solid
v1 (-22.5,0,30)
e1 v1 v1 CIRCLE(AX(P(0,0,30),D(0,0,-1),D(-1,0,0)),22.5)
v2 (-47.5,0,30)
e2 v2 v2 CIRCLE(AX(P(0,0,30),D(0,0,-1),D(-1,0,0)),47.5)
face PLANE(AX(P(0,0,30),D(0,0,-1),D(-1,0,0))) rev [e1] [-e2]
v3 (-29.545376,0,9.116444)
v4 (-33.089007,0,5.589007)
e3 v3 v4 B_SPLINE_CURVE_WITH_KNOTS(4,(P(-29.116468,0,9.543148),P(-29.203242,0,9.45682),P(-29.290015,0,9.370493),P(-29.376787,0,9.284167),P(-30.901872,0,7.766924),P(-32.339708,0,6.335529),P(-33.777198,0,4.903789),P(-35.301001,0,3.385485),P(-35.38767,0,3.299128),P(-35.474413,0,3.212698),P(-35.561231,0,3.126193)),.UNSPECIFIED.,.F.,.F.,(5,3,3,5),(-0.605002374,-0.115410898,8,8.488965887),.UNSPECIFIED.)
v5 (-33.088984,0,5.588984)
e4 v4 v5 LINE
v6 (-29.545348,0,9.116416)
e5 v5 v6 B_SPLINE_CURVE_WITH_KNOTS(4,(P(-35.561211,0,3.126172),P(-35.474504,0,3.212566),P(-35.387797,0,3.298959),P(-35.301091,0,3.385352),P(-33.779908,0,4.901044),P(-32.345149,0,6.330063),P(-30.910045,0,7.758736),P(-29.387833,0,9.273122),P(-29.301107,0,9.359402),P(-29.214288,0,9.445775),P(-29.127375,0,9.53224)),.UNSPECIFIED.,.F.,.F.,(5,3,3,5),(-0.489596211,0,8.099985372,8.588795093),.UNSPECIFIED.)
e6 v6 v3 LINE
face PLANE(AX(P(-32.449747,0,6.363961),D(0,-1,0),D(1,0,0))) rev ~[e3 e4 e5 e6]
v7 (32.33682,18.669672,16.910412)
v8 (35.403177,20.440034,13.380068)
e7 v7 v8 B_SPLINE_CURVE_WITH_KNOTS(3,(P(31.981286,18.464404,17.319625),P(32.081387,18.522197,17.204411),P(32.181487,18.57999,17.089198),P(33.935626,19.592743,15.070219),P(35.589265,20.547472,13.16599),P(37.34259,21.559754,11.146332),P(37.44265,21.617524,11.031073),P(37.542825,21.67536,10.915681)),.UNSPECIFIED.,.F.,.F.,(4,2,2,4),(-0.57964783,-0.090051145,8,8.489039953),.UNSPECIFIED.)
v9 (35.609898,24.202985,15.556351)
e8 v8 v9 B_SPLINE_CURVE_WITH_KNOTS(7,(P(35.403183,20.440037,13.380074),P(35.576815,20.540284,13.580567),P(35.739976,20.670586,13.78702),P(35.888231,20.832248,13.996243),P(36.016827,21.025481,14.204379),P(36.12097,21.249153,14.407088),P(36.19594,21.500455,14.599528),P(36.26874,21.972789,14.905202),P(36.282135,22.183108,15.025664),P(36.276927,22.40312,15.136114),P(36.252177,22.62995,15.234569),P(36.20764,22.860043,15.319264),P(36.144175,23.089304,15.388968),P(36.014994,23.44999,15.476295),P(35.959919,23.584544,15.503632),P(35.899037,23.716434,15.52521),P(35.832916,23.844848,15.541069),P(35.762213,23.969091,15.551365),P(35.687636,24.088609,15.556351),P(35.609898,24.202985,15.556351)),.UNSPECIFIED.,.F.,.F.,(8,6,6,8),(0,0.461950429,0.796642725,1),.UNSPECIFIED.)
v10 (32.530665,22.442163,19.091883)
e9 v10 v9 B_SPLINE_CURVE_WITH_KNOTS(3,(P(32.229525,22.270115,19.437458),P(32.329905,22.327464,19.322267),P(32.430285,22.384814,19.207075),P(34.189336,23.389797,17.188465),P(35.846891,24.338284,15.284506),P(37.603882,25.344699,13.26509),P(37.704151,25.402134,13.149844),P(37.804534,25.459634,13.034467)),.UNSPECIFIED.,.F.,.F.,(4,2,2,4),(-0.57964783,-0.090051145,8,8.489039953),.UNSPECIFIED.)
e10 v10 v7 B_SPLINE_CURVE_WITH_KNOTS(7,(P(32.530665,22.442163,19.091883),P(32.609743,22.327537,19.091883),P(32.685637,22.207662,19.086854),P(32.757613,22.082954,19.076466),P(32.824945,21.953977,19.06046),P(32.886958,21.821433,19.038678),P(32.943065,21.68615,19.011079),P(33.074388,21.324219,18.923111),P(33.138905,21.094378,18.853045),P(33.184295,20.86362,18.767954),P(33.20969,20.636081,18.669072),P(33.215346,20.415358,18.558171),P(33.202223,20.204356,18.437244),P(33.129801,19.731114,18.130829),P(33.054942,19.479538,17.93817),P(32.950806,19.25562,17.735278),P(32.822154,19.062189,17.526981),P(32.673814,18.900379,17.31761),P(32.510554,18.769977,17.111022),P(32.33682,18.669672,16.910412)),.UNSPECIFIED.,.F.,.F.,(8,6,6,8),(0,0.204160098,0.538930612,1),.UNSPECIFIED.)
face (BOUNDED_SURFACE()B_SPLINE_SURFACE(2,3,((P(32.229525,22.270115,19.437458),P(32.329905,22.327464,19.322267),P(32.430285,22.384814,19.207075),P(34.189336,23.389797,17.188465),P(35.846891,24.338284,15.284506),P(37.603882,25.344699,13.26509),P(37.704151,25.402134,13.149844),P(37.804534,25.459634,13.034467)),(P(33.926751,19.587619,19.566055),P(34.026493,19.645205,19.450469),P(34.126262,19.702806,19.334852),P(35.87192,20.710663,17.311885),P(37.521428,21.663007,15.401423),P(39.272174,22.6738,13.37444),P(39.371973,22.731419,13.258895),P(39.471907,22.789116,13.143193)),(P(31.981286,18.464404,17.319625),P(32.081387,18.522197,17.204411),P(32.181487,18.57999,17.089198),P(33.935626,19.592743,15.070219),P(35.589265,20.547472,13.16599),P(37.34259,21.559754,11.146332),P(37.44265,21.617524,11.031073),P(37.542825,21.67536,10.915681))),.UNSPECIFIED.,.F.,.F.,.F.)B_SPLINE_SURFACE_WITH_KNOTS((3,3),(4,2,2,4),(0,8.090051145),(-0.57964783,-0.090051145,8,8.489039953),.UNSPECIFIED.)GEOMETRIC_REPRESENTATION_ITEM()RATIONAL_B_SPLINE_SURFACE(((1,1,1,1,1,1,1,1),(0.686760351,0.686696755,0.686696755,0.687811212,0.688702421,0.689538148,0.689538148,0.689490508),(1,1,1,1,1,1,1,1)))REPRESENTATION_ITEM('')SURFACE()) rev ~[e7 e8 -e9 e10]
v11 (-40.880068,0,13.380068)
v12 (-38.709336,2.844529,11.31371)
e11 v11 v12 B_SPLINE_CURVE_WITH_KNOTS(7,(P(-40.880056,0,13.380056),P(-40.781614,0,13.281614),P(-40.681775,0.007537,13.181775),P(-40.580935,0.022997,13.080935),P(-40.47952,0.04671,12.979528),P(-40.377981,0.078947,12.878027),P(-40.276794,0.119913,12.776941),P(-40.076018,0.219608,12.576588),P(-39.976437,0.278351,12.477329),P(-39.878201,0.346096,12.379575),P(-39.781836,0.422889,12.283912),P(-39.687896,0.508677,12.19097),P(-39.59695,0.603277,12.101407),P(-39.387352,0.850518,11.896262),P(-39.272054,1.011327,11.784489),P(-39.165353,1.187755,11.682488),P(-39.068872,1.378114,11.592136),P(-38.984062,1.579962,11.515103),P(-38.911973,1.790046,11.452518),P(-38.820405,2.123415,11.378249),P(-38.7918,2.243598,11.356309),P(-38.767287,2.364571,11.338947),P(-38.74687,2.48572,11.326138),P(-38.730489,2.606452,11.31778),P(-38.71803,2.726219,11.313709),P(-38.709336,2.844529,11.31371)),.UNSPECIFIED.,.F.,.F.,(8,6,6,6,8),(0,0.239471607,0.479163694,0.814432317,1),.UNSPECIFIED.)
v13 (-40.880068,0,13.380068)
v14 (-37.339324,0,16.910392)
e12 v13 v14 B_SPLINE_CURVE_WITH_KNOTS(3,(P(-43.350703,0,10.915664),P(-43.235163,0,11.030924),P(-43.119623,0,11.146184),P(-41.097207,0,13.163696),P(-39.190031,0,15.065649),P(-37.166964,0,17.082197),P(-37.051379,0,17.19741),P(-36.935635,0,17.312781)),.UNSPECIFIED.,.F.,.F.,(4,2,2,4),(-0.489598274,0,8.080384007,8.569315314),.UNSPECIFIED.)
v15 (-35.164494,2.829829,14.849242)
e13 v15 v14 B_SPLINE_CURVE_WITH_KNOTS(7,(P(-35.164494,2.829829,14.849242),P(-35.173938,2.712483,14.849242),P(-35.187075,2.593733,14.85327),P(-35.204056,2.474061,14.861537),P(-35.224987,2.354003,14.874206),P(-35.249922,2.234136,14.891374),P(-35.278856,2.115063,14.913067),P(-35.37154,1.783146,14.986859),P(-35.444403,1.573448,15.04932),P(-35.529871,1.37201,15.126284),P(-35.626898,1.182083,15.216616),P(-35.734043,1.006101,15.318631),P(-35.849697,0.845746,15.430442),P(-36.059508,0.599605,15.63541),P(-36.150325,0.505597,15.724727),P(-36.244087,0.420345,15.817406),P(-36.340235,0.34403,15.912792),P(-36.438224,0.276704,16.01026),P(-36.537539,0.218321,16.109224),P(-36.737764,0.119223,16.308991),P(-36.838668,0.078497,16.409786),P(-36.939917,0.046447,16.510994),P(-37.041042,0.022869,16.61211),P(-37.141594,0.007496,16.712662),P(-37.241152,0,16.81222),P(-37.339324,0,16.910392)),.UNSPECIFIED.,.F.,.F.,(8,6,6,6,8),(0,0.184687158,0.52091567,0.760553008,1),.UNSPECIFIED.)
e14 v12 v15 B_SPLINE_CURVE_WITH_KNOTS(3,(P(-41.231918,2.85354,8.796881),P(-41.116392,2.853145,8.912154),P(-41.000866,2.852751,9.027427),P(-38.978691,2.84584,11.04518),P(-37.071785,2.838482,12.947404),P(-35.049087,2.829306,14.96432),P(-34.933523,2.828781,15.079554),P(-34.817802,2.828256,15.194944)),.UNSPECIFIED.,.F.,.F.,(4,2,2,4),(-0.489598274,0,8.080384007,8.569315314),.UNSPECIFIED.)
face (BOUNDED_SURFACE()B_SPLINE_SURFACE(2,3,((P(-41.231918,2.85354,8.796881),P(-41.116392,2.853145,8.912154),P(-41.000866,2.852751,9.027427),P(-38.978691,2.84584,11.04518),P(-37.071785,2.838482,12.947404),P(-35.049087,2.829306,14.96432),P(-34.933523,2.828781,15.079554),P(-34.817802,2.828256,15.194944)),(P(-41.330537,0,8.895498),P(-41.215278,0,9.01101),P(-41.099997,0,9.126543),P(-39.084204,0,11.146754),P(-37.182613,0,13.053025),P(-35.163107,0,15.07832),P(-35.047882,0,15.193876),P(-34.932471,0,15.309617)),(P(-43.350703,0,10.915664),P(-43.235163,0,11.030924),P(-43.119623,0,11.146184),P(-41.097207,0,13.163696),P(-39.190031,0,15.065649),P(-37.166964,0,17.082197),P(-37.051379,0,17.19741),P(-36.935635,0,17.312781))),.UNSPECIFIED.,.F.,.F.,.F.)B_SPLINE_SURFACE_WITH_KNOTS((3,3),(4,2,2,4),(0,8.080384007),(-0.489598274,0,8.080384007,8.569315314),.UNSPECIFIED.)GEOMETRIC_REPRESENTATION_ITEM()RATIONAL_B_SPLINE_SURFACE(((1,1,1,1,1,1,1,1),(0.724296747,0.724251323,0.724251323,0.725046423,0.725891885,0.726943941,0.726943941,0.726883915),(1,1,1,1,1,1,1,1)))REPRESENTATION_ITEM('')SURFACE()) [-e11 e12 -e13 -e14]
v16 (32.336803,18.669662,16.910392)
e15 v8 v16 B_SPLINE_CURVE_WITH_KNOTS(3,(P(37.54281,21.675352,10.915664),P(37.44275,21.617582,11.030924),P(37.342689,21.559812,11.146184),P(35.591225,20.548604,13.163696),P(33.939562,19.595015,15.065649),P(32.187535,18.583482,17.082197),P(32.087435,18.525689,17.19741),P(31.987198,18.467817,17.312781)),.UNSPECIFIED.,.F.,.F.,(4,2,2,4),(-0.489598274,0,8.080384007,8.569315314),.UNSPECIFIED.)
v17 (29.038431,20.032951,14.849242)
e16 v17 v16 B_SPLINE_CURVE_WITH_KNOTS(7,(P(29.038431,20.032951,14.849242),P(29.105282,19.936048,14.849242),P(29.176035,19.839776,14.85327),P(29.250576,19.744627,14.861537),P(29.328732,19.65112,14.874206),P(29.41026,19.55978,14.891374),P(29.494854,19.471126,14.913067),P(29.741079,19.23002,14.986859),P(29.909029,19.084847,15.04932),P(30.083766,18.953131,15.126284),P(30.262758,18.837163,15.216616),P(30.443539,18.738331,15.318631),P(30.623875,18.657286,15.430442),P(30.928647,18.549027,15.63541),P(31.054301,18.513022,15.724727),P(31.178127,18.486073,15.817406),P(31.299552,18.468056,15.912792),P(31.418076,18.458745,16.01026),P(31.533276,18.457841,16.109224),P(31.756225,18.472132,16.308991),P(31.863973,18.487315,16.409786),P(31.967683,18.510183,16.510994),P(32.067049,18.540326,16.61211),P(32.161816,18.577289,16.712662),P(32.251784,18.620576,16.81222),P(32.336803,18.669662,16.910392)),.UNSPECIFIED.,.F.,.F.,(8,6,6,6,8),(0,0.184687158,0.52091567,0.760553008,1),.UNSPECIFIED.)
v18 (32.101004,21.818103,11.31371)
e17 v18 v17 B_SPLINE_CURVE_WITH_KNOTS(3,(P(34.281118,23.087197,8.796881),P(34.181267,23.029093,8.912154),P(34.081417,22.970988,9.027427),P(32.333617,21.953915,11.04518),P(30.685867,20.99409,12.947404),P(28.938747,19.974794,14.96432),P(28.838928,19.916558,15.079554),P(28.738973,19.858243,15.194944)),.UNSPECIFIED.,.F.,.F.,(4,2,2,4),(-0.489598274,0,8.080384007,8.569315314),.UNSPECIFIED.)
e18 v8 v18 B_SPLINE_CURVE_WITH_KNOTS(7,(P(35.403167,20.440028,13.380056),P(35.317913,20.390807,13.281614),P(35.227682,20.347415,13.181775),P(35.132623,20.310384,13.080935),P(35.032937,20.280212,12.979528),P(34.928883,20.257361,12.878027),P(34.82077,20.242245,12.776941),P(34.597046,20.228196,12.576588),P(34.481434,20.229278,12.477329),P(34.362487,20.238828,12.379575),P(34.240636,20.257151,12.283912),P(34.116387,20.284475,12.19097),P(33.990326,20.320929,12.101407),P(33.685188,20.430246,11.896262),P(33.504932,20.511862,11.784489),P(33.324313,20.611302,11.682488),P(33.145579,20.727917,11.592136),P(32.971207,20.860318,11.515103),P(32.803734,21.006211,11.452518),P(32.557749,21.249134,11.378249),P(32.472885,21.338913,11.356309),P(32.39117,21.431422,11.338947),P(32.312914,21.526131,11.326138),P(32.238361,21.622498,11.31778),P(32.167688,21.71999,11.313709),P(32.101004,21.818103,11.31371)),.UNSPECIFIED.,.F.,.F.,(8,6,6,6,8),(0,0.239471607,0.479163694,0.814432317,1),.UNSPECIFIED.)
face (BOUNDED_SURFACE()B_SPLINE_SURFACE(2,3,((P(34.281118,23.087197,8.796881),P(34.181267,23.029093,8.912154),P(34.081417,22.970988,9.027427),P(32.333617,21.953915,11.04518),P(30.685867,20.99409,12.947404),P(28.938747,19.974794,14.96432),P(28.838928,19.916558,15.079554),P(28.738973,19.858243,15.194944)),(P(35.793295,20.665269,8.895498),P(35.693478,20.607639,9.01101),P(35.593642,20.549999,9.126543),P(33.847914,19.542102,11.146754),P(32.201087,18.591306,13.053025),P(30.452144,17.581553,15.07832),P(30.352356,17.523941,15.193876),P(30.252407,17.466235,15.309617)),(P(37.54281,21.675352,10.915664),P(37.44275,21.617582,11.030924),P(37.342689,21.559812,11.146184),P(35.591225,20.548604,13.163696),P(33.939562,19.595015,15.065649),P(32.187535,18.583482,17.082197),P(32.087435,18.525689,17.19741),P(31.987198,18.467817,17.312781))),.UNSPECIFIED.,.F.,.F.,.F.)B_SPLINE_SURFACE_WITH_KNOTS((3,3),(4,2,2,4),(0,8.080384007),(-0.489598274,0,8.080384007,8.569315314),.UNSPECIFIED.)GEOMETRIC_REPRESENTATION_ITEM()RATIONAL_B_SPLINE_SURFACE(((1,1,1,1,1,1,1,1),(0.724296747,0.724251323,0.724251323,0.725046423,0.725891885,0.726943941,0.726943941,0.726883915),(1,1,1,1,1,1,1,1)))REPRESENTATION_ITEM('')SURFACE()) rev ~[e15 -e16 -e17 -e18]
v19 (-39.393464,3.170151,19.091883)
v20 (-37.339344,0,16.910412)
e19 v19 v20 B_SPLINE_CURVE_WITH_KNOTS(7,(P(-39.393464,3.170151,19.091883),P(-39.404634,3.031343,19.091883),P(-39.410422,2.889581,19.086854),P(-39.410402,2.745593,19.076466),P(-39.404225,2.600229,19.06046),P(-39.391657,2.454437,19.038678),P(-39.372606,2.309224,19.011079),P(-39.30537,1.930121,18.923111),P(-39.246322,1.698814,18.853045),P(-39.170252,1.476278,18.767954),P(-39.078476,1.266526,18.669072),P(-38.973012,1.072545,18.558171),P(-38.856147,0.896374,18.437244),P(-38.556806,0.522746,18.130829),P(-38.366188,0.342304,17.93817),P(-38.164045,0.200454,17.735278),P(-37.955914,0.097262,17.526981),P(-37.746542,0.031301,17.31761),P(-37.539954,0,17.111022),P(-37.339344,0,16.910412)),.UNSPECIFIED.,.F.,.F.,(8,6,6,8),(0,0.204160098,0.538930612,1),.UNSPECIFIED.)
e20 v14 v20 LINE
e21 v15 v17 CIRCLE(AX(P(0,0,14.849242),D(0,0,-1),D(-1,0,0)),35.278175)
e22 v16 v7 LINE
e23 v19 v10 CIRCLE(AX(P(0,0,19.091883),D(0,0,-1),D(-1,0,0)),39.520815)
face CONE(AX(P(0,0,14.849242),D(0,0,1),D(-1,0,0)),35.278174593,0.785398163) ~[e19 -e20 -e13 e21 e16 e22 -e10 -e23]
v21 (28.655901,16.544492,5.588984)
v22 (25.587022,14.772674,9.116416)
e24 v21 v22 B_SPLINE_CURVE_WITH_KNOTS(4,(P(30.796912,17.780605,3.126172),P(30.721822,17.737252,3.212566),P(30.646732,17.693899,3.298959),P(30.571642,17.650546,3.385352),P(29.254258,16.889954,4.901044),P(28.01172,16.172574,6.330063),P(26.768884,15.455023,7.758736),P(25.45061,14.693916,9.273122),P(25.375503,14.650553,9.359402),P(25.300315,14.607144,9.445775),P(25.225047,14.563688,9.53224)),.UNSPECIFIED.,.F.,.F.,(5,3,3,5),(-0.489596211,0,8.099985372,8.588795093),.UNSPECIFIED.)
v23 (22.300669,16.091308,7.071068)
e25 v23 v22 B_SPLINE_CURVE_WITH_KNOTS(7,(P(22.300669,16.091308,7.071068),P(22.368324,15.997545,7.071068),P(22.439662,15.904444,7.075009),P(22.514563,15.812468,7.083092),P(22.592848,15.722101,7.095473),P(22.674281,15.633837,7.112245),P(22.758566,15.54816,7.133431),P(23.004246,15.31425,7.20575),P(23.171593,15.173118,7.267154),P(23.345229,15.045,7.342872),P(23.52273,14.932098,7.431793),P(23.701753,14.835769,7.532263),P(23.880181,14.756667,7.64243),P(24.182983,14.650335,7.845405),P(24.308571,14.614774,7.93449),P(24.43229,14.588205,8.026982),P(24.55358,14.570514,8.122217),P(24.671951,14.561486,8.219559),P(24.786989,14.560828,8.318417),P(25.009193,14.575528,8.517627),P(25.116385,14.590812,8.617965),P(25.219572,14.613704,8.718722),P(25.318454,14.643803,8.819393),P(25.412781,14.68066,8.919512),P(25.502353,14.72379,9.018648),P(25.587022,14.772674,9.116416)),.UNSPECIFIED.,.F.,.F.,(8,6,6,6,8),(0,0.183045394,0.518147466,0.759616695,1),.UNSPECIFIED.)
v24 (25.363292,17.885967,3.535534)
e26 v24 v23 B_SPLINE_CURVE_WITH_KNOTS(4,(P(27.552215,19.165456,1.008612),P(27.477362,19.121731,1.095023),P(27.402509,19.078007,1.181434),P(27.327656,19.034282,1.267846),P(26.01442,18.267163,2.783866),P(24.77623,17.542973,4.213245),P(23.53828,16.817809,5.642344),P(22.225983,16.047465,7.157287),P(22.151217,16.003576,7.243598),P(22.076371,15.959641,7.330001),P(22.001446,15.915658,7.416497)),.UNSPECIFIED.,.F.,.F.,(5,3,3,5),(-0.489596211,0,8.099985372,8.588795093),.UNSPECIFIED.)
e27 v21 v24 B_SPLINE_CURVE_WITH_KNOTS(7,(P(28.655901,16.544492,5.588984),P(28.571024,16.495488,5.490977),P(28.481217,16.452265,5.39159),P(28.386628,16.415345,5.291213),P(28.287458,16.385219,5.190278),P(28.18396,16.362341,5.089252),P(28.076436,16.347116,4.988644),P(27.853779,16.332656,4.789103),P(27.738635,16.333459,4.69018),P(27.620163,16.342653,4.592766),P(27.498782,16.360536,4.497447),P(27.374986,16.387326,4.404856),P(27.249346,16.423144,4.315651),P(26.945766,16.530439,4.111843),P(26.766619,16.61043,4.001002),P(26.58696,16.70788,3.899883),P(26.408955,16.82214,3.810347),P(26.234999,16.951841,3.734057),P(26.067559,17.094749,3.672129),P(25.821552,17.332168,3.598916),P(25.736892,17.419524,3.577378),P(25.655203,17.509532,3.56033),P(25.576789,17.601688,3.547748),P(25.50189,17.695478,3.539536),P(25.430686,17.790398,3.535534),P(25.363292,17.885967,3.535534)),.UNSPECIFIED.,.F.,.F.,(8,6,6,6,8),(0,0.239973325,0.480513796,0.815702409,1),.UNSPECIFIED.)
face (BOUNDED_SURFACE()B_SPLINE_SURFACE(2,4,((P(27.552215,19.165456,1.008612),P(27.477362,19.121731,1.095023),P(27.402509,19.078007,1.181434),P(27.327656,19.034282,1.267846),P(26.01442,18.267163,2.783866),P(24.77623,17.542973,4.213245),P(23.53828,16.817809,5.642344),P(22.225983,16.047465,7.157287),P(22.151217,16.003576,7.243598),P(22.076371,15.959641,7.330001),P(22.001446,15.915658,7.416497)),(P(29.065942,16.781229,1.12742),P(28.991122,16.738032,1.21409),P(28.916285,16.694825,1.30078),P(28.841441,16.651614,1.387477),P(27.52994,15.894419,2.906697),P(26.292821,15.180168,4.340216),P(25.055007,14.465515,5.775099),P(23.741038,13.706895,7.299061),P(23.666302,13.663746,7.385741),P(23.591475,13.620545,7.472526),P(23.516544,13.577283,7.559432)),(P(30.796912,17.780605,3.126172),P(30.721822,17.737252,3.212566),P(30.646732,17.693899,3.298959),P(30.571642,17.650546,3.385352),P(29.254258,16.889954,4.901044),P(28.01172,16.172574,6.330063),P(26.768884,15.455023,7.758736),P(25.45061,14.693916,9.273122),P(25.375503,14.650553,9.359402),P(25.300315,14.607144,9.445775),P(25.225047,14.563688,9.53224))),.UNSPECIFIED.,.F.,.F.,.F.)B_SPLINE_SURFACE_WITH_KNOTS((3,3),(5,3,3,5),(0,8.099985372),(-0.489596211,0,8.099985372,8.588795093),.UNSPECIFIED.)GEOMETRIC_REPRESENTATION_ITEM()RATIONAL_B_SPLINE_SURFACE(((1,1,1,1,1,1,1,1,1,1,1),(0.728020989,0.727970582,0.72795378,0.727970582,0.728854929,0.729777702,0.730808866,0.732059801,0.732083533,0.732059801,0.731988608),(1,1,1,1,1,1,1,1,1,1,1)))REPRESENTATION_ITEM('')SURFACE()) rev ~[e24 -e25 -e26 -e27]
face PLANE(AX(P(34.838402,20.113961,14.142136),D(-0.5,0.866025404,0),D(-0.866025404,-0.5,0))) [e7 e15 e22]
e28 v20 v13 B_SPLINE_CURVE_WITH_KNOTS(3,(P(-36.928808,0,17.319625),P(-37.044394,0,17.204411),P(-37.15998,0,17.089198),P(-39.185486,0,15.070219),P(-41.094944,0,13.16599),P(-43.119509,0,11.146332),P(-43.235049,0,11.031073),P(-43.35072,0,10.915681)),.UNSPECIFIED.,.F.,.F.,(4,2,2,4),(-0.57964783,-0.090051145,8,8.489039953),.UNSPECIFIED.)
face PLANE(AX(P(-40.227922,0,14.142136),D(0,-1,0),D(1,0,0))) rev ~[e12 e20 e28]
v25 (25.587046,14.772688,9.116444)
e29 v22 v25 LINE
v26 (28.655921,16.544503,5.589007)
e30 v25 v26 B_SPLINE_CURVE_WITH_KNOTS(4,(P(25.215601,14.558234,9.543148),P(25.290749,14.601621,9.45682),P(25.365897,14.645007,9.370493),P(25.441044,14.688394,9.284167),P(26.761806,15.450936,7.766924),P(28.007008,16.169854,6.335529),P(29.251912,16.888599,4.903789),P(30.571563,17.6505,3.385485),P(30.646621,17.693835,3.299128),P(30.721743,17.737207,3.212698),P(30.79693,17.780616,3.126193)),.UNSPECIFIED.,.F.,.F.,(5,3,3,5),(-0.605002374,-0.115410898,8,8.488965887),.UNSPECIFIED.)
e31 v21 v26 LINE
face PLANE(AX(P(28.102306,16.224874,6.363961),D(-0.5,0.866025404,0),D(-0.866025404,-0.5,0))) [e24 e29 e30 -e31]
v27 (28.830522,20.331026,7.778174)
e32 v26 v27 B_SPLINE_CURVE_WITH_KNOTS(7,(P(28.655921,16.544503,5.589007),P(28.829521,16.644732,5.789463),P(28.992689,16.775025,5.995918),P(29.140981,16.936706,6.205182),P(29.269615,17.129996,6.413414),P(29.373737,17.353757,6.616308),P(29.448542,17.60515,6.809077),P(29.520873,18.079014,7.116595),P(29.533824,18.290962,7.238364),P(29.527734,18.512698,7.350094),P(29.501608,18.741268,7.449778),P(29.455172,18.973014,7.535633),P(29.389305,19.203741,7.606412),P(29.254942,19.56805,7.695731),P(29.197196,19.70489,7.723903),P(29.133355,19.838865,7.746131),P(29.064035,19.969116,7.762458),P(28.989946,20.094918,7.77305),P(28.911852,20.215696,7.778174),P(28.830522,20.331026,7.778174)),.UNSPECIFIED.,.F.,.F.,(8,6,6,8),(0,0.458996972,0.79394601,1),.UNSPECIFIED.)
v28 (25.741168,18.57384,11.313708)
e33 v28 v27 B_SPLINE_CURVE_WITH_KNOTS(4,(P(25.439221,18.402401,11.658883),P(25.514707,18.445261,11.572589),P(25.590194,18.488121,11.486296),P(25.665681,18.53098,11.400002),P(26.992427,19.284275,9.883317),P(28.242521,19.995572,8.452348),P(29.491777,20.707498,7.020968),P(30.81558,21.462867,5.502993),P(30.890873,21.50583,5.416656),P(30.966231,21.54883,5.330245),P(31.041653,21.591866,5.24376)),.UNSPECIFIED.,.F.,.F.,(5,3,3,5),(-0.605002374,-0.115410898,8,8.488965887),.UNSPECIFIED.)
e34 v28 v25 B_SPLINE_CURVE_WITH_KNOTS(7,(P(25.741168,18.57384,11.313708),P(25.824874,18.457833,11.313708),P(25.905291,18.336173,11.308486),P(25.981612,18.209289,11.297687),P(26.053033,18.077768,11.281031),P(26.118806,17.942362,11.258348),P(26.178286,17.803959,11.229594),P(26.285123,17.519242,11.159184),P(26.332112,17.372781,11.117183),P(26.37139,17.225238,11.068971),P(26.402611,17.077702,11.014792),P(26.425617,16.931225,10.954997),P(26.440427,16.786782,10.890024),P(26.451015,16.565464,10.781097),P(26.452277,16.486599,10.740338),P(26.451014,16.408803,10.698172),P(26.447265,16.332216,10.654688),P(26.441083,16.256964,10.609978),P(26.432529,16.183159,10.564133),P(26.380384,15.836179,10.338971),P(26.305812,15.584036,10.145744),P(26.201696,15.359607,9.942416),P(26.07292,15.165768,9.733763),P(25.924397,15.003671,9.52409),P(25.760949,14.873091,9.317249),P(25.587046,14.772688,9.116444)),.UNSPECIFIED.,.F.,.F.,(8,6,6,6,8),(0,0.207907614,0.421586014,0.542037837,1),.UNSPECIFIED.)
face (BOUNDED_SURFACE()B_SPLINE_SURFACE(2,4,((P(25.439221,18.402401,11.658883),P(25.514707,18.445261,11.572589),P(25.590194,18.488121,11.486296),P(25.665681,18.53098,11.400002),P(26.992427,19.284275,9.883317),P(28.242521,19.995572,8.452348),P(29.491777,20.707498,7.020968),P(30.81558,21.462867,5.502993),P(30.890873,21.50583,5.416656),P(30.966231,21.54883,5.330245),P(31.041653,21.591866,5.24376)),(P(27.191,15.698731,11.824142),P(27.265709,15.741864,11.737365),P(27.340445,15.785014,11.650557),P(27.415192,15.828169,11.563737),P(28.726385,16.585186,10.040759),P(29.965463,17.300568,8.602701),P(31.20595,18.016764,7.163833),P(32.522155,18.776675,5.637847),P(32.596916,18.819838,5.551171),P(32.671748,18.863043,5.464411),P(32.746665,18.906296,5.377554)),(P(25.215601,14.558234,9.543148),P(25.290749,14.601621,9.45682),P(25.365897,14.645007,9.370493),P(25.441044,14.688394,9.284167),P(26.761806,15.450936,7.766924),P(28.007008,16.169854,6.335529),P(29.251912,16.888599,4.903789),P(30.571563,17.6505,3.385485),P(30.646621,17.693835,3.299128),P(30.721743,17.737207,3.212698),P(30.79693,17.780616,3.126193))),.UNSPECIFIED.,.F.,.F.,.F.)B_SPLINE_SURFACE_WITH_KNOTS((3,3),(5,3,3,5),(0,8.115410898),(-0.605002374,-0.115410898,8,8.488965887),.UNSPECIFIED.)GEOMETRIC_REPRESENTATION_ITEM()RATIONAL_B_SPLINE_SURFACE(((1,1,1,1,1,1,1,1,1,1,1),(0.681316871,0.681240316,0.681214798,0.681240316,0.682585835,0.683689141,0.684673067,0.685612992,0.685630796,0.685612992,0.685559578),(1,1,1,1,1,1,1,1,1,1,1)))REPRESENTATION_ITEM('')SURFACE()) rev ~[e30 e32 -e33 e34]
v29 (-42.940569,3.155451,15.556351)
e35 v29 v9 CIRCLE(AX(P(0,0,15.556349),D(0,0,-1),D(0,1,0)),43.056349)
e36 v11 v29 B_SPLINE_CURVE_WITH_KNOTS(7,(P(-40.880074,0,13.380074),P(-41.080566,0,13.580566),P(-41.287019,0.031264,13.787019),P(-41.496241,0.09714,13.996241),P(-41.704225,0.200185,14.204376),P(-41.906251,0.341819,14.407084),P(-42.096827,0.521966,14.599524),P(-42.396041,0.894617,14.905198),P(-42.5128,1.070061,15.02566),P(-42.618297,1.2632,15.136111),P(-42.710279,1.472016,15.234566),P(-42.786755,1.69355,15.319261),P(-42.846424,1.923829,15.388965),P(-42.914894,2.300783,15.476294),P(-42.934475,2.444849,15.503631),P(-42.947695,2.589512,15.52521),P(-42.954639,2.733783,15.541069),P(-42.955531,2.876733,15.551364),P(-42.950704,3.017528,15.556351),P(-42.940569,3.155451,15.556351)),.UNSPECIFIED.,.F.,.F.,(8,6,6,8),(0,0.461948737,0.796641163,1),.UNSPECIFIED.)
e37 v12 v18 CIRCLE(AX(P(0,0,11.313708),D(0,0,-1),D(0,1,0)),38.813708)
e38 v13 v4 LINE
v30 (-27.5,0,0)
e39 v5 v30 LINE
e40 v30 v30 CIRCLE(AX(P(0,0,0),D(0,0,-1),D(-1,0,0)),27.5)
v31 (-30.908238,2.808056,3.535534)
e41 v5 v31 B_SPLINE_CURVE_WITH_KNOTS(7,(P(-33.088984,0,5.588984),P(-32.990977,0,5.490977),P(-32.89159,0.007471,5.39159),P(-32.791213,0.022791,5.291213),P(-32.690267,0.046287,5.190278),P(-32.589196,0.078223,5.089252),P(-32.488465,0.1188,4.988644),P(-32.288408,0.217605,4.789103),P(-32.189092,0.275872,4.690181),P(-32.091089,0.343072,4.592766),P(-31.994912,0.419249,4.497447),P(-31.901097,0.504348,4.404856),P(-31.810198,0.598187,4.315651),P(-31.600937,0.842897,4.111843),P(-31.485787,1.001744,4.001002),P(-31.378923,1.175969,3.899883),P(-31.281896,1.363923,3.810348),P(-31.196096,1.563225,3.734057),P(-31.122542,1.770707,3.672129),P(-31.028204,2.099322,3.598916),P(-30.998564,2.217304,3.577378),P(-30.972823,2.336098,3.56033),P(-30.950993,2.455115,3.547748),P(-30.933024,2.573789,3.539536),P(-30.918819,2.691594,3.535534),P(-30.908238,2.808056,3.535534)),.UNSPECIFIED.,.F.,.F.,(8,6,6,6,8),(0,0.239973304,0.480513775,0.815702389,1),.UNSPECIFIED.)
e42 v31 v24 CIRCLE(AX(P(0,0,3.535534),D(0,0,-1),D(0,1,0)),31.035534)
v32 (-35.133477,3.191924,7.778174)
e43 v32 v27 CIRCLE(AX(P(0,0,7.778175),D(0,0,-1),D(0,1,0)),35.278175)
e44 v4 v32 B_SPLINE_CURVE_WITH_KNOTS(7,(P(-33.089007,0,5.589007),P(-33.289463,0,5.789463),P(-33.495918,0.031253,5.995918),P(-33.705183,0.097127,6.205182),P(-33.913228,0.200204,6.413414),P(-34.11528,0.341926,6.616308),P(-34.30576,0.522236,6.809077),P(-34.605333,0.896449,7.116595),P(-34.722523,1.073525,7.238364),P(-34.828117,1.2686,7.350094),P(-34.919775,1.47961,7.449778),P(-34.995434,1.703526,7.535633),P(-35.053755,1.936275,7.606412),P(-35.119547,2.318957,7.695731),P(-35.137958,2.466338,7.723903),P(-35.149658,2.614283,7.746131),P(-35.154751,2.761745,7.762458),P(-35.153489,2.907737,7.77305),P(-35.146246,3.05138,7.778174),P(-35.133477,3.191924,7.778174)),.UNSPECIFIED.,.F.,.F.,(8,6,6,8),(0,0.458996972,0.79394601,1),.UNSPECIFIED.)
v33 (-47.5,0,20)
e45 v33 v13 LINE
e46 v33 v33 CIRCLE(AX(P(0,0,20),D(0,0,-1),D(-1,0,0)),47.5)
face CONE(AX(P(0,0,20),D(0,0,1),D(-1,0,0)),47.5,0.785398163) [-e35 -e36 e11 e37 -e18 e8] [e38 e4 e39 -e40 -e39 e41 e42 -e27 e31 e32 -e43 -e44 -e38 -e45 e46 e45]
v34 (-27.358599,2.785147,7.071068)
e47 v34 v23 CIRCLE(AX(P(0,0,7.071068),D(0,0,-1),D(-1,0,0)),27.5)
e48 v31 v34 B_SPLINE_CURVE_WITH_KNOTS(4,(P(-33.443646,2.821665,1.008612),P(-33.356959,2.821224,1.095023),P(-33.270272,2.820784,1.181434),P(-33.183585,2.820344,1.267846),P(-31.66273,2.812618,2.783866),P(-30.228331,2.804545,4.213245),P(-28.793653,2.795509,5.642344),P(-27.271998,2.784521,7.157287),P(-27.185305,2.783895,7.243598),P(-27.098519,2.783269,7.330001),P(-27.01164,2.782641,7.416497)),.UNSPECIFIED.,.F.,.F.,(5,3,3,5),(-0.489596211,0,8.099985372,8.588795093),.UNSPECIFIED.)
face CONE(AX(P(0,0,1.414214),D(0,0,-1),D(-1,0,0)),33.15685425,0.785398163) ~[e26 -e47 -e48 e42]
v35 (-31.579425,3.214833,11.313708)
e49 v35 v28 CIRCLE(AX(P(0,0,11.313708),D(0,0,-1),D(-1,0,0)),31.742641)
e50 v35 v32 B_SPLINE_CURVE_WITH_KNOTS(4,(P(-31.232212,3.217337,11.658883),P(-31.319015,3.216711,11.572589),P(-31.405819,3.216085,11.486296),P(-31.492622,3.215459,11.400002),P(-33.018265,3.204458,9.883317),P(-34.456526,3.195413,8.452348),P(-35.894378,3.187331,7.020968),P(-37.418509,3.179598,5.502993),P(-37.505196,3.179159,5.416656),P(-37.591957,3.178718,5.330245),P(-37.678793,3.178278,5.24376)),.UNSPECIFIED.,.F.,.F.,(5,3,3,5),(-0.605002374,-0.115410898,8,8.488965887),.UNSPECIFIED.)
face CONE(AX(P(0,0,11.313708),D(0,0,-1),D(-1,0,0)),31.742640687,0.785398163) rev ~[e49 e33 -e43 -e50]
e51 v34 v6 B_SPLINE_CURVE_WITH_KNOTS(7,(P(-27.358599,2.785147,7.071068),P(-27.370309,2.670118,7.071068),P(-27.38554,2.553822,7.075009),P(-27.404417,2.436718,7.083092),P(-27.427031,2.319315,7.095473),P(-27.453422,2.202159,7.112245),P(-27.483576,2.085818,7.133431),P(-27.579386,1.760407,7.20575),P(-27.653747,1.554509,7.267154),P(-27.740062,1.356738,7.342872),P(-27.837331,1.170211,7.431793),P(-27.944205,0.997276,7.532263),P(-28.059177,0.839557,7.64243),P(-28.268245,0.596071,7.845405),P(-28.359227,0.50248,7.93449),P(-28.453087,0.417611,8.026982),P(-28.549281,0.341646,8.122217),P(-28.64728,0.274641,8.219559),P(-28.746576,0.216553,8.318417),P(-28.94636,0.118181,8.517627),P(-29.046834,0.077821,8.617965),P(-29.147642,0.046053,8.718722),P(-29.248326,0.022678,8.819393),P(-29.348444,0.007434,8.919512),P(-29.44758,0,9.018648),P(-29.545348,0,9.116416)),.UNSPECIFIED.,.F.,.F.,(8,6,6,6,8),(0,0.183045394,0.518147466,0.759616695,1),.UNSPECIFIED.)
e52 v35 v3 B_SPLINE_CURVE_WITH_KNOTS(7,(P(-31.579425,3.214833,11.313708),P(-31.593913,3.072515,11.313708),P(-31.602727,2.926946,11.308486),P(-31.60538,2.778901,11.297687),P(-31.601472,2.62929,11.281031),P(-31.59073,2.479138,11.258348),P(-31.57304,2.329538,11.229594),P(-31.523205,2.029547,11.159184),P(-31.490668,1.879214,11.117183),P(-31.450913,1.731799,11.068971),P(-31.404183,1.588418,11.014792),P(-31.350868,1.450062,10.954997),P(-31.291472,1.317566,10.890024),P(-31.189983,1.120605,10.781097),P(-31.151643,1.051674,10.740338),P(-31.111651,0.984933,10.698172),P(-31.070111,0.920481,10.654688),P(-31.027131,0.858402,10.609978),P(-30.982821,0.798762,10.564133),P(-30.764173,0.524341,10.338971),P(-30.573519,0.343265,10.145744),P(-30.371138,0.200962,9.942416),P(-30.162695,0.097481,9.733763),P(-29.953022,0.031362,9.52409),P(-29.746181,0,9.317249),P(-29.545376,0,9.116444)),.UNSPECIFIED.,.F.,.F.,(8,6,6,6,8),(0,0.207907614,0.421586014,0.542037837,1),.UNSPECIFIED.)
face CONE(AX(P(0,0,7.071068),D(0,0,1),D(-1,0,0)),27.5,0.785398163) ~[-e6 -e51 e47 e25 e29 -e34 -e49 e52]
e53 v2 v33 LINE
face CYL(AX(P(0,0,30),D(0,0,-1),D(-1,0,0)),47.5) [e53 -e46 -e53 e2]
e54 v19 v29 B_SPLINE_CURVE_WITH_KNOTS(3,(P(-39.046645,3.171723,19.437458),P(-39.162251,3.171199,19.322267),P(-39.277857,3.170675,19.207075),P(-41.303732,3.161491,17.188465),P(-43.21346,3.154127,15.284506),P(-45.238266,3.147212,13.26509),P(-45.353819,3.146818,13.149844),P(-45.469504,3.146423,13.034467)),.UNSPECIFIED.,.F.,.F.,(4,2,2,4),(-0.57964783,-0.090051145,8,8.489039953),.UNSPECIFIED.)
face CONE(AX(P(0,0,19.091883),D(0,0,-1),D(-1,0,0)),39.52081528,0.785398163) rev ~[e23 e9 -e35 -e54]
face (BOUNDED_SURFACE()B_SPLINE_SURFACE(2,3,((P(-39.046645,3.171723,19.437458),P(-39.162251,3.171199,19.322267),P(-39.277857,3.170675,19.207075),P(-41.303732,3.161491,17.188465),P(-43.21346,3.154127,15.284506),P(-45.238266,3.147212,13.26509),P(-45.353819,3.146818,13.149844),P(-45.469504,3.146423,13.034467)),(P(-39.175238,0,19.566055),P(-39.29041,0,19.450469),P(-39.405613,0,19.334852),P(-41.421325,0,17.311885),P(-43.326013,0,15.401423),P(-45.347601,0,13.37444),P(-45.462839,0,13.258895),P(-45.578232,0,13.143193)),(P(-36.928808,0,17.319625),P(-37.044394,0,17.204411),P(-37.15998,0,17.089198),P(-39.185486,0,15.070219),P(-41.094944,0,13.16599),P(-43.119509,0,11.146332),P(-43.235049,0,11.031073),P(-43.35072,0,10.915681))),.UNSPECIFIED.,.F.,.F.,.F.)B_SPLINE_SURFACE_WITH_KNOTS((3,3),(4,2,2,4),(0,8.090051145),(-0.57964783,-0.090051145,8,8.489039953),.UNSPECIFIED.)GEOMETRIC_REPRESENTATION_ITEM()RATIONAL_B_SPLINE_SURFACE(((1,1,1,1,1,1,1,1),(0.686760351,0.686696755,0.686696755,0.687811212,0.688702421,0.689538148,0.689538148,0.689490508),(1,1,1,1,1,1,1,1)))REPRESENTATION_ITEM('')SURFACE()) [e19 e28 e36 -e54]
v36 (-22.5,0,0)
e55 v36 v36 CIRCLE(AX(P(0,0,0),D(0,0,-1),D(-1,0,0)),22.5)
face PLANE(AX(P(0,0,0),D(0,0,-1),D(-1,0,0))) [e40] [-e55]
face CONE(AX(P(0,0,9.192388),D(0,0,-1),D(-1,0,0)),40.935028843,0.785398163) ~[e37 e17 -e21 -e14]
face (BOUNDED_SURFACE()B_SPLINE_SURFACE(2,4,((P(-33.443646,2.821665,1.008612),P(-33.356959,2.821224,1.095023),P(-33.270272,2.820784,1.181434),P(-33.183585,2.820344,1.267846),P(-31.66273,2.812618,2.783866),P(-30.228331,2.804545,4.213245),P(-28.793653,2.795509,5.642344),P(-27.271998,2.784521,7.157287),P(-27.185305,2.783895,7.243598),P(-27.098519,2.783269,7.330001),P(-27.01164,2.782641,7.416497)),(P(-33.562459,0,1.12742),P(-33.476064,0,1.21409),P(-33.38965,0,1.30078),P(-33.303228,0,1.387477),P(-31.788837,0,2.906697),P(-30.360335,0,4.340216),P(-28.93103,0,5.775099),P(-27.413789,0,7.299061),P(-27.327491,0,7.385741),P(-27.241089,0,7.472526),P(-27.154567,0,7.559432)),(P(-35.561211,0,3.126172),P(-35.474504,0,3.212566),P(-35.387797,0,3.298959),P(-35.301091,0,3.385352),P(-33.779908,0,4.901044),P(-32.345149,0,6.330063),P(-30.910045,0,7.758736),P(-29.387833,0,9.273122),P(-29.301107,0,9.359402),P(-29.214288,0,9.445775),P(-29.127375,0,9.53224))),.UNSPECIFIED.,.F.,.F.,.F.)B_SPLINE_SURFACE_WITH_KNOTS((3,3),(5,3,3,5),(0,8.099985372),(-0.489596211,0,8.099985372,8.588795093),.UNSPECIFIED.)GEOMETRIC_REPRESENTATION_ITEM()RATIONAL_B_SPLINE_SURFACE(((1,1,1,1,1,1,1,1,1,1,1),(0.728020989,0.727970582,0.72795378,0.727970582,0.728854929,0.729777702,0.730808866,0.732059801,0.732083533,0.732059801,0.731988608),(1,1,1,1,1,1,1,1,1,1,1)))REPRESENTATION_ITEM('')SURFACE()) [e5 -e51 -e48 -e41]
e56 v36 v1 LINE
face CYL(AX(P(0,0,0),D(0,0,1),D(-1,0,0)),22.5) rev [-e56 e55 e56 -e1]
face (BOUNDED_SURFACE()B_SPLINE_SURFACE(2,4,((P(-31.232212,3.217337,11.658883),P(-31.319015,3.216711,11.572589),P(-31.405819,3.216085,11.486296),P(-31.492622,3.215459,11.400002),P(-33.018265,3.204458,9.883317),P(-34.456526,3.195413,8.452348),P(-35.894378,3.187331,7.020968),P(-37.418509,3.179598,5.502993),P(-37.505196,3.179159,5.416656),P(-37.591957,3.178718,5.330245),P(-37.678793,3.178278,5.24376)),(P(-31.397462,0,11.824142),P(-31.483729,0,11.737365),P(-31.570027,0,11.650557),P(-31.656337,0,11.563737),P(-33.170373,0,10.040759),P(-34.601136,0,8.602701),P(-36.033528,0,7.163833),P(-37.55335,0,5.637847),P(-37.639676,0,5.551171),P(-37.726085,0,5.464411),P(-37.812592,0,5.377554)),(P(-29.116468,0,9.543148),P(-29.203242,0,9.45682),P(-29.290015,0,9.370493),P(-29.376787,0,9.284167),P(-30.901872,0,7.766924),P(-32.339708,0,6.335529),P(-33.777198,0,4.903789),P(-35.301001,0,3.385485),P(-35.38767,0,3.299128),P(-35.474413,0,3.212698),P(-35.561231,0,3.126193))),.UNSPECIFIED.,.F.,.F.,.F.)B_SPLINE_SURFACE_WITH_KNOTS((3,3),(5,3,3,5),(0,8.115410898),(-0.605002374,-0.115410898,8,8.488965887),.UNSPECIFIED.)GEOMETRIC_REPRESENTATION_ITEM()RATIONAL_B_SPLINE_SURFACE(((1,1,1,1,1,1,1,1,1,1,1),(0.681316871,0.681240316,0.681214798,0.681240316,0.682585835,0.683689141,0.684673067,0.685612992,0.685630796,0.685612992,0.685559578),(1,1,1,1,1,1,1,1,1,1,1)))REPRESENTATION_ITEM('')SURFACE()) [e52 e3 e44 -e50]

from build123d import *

# Parameters (mm, degrees)
F3_ANGLE = 150
F4_R     = 2.99999
F4_2_R   = 2.99999


# Not quite as in the source:
# - a fillet or chamfer is up to 0.001 mm smaller than in the source, because OpenCascade refuses the exact size


with BuildPart() as f1:
    # F0 (on Front) → F1 (revolve)
    with BuildSketch(Plane.XZ):
        Polygon((-22.5, 0), (-22.5, 30), (-47.5, 30), (-47.5, 20), (-27.5, 0), align=None)
    revolve(axis=Axis((0, 0, 9.4880101401), (0, 0, -1)))


with BuildPart() as f3:
    # F2 (on Front) → F3 (revolve)
    with BuildSketch(Plane.XZ):
        Polygon((-35.2781745931, 14.8492424049), (-39.5208152802, 19.091883092), (-45.1776695297, 13.4350288425), (-40.9350288425, 9.1923881554), align=None)
    revolve(axis=Axis((0, 0, 13.259918429), (0, 0, -1)), revolution_arc=F3_ANGLE)

    # F4 (radius 3 in the source; OpenCascade refuses exactly that, so slightly less here)
    f4_edges = [f3.edges().sort_by_distance(p)[0] for p in [
        (-42.349242, 0, 16.263456),
        (-38.106602, 0, 12.020815),
        (33.001285, 19.053301, 12.020815),
        (36.67552, 21.174621, 16.263456),
    ]]
    fillet(f4_edges, radius=F4_R)


with BuildPart() as f3b:
    # F2 (on Front) → F3, piece 2 (revolve)
    with BuildSketch(Plane.XZ):
        Polygon((-31.7426406871, 11.313708499), (-37.3994949366, 5.6568542495), (-33.1568542495, 1.4142135624), (-27.5, 7.0710678119), align=None)
    revolve(axis=Axis((0, 0, 13.259918429), (0, 0, -1)), revolution_arc=F3_ANGLE)

    # F4#2 (radius 3 in the source; OpenCascade refuses exactly that, so slightly less here)
    f4_2_edges = [f3b.edges().sort_by_distance(p)[0] for p in [
        (-30.328427, 0, 4.242641),
        (-34.571068, 0, 8.485281),
        (26.265188, 15.164214, 4.242641),
        (29.939423, 17.285534, 8.485281),
    ]]
    fillet(f4_2_edges, radius=F4_2_R)


with BuildPart() as f1_1:
    add(f1.part)

    # F5: cut F3b, F3
    add(f3b.part, mode=Mode.SUBTRACT)
    add(f3.part, mode=Mode.SUBTRACT)


solid = f1_1.part
